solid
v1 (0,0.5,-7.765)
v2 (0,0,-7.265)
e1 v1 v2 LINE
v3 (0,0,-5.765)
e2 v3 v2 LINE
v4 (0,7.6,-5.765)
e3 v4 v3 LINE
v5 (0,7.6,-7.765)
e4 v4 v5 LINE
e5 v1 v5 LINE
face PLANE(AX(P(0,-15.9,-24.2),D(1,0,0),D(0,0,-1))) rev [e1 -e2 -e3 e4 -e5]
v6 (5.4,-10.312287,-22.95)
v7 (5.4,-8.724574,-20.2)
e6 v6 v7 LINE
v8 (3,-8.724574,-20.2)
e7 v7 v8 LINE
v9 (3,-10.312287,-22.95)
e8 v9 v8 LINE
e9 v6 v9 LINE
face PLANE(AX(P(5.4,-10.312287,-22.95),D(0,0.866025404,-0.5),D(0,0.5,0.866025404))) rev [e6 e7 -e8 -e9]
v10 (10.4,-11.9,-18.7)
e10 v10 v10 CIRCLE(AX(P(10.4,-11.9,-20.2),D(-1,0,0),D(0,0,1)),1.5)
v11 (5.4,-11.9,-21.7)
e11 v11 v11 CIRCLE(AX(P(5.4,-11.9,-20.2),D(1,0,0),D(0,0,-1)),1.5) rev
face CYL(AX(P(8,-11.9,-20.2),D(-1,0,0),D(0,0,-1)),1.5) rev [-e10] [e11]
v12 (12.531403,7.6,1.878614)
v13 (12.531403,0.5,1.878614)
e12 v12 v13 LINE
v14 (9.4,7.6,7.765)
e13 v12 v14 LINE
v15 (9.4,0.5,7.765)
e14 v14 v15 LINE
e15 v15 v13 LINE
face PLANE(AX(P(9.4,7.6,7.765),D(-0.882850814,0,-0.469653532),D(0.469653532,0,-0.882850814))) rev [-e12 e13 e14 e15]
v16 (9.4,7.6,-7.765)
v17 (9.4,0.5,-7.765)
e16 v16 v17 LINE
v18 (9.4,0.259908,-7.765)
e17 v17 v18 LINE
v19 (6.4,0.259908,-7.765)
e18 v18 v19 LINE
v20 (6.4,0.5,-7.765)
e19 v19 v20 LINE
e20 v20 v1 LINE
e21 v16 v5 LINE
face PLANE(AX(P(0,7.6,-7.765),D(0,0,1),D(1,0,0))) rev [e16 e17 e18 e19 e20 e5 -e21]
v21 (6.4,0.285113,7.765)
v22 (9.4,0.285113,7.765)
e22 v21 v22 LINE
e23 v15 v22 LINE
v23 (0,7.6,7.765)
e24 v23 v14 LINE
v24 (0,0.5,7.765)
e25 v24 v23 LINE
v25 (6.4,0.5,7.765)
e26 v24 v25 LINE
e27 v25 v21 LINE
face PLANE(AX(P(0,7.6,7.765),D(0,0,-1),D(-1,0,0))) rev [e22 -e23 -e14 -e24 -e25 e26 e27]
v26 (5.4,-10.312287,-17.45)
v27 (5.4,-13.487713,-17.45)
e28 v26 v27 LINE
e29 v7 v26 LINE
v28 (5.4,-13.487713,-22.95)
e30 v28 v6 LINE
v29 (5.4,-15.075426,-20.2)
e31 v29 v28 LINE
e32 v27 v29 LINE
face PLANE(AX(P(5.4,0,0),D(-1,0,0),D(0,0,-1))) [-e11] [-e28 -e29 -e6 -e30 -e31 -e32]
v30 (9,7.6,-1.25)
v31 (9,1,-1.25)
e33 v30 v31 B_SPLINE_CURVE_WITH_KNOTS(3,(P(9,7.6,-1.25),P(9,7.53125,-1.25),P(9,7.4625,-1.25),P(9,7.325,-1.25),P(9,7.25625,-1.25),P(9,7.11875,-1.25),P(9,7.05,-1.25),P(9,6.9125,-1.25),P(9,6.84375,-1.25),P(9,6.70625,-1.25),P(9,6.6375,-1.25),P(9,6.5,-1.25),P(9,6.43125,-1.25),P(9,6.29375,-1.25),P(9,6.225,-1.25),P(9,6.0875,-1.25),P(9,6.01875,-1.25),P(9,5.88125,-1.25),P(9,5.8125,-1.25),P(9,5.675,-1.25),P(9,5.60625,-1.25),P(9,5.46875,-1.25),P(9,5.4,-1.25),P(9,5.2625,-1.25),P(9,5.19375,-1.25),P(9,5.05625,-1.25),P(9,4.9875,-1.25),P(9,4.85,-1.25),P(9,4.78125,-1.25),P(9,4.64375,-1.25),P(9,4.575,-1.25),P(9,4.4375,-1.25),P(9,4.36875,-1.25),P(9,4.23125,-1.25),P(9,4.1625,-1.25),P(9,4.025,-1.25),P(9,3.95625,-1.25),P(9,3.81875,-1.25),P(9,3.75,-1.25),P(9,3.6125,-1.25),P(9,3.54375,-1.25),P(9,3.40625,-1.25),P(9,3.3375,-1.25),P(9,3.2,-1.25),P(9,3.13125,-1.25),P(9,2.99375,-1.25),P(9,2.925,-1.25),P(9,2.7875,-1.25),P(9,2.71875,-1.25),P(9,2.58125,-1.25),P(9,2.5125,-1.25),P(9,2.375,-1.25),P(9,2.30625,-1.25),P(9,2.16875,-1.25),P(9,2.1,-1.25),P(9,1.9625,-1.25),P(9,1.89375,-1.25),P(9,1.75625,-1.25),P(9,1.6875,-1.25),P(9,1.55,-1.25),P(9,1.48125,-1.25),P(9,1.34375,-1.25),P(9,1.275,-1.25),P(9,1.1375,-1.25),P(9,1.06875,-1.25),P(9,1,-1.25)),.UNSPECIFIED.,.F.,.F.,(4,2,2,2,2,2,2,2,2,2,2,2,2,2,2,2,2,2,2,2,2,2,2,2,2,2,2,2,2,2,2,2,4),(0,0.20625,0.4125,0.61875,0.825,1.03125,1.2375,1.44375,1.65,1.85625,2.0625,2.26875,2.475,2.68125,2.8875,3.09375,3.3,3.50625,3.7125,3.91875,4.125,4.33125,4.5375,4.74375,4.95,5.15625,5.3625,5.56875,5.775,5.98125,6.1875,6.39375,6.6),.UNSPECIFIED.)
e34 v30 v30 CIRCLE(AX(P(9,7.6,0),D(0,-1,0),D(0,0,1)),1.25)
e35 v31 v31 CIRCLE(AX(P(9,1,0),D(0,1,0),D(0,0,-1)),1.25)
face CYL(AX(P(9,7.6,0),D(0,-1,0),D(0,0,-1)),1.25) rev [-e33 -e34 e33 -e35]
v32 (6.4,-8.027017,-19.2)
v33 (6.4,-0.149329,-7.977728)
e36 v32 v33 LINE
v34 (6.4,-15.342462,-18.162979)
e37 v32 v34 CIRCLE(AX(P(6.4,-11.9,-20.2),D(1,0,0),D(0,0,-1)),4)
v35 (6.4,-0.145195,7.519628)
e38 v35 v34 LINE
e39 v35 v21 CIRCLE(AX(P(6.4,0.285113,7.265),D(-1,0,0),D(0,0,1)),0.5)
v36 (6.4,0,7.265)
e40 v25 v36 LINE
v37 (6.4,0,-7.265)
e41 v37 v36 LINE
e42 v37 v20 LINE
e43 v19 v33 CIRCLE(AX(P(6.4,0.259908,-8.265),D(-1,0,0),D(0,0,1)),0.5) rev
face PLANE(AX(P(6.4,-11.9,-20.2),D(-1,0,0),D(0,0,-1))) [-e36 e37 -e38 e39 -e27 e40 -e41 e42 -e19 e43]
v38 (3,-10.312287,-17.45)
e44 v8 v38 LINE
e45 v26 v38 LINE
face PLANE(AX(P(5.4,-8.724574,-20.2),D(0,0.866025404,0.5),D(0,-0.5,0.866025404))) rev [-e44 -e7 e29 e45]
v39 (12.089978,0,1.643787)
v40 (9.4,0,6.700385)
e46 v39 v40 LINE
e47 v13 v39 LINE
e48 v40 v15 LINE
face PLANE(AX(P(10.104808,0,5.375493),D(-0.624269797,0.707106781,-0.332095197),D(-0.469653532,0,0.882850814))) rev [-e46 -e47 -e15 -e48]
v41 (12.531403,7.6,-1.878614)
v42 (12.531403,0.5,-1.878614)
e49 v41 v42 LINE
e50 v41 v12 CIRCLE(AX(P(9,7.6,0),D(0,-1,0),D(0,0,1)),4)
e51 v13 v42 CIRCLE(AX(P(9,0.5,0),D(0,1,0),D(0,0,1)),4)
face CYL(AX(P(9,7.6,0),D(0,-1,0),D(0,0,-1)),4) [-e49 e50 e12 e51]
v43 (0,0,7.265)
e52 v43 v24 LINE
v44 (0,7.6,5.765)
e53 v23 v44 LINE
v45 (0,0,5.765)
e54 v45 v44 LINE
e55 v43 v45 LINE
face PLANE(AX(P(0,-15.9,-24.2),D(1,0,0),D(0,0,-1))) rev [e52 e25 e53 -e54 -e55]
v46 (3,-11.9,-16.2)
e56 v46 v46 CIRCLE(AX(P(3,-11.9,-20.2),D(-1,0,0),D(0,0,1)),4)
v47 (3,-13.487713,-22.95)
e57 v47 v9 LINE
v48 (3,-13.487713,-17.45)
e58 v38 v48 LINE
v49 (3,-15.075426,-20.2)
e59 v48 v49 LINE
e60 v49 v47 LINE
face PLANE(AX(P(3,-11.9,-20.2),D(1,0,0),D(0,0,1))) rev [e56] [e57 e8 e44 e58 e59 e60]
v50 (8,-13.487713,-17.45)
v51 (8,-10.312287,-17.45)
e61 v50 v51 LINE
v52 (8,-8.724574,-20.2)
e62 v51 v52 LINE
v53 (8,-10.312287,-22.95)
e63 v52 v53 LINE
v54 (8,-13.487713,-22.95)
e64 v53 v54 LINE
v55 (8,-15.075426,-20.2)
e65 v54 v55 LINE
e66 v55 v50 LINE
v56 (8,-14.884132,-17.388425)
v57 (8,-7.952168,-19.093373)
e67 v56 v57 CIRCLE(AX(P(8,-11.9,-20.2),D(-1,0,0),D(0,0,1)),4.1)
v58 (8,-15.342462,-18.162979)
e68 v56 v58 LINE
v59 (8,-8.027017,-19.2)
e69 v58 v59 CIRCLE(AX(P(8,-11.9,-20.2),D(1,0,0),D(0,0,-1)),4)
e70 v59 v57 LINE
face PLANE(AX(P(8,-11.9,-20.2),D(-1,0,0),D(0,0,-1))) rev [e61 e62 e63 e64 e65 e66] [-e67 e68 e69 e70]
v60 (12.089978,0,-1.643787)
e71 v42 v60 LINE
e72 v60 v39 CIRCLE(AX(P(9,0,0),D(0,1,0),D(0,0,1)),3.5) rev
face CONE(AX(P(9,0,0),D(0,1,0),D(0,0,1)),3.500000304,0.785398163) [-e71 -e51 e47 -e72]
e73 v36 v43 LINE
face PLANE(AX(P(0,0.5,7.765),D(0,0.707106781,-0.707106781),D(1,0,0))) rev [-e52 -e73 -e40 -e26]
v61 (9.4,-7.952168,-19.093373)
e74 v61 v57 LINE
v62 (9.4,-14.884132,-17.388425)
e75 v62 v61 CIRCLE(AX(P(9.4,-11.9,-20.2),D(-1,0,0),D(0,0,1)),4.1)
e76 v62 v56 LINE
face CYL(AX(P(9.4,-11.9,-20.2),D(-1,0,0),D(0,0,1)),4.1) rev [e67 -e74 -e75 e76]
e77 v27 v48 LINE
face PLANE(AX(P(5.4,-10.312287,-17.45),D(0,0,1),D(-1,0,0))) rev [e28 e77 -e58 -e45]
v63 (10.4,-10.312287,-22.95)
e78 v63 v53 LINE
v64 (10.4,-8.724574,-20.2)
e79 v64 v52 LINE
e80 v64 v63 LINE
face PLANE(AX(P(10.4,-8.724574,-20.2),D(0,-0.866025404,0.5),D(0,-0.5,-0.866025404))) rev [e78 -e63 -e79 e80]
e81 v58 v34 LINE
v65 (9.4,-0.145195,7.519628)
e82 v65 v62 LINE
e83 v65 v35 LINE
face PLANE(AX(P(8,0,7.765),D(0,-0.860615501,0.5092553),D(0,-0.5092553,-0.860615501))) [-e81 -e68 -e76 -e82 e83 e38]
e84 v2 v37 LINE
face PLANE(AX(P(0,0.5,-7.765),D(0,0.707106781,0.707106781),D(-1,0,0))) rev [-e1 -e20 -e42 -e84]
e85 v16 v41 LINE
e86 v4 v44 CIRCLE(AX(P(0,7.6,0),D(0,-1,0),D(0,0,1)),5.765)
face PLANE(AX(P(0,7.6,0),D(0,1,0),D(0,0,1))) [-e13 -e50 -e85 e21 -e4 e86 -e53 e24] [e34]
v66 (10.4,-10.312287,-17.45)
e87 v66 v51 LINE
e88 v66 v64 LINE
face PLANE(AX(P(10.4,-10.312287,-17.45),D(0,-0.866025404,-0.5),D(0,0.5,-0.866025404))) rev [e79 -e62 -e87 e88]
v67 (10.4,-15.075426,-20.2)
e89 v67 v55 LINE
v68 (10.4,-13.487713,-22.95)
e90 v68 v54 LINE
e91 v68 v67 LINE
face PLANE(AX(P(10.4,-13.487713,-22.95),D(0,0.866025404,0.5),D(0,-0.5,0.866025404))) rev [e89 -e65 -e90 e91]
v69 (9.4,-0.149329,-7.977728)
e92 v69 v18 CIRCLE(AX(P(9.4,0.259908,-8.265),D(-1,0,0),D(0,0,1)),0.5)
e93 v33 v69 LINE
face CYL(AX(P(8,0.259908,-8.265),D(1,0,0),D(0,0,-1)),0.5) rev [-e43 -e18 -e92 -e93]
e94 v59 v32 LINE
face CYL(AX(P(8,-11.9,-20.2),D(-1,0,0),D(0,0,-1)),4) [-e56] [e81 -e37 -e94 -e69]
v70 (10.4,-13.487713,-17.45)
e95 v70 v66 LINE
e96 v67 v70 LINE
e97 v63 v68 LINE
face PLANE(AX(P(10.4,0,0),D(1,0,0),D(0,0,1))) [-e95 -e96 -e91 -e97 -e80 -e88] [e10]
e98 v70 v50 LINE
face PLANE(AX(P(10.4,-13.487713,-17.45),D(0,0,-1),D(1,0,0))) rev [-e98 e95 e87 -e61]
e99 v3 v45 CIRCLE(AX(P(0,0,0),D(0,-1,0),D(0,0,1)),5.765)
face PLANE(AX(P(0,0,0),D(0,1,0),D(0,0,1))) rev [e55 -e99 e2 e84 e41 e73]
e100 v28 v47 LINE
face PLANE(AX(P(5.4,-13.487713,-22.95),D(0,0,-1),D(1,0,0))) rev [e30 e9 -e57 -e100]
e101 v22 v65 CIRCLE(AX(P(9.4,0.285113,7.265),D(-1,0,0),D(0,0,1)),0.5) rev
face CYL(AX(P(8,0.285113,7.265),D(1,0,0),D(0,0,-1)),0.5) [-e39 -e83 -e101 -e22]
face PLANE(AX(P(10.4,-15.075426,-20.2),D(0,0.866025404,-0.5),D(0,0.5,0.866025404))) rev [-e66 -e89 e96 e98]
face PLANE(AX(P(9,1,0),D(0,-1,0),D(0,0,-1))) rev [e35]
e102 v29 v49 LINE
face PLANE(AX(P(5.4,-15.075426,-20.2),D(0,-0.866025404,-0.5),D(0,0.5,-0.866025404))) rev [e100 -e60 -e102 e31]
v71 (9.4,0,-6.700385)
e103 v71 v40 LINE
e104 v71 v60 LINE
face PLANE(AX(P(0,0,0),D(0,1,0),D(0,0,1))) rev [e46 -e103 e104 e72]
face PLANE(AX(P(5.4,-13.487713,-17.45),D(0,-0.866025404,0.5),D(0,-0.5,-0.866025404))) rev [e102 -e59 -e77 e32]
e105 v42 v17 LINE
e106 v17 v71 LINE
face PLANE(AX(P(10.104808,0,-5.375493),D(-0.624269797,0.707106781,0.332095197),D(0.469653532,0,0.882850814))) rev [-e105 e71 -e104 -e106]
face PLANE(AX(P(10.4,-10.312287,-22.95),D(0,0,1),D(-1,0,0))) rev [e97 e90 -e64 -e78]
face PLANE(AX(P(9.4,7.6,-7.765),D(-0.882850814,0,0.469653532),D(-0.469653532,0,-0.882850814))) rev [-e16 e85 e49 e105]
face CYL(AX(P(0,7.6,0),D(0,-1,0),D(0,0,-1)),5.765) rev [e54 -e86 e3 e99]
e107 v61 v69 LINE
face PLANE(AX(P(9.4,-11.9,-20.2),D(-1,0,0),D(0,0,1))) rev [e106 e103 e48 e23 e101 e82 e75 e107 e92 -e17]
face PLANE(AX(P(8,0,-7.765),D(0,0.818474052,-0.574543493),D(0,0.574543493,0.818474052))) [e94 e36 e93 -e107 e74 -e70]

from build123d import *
from build123d.topology import SkipClean

# Parameters (mm, degrees)
SKETCH1_R            = 1.25
BRACKET_DEPTH        = 7.6
SKETCH2_R            = 1.5
ARM_DEPTH            = 1.6
SKETCH3_R            = 1.25
MOUNT_BLIND_DEPTH    = 1
EFFECTOR_START       = -5
SKETCH4_R            = 4
SKETCH4_R_2          = 1.5
EFFECTOR_MOUNT_DEPTH = 5
MOUNT_TRAP_DEPTH     = 2.4
SKETCH6_R            = 1.5
MOUNT_ADAPTOR_DEPTH  = 2.4
SKETCH7_W            = 12.99999996
SKETCH7_H            = 31.965
MIRROR_DELETE_DEPTH  = 37.150933583
ARM_SUPPORT_DEPTH    = 1.4
BODY_CHAMFER_SIZE    = 0.5
ARM_FILLET_R         = 0.5


with BuildPart() as part:
    # Sketch1 → Bracket (new body)
    with BuildSketch(Plane(origin=(0, 0, 0), x_dir=(1, 0, 0), z_dir=(0, 1, 0))):
        with BuildLine():
            Line((0, 7.765), (-9.4, 7.765))
            Line((-9.4, 7.765), (-12.531403257, 1.878614127))
            ThreePointArc((-12.531403257, 1.878614127), (-12.99999996, 0), (-12.531403257, -1.878614127))
            Line((-12.531403257, -1.878614127), (-9.4, -7.765))
            Line((-9.4, -7.765), (0, -7.765))
            Line((0, -7.765), (0, -5.765))
            ThreePointArc((0, -5.765), (-5.765, 0), (0, 5.765))
            Line((0, 5.765), (0, 7.765))
        make_face()
        with Locations(Location((-9, 0, 0), (0, 0, 90))):
            Circle(SKETCH1_R, mode=Mode.SUBTRACT)
    bracket = extrude(amount=BRACKET_DEPTH)

    # Sketch2 → Arm (add)
    with BuildSketch(Plane(origin=(-6.4, 0, 0), x_dir=(0, 0, -1), z_dir=(1, 0, 0))):
        with BuildLine():
            Line((-7.765, 0), (18.162978801, -15.342462002))
            ThreePointArc((18.162978801, -15.342462002), (24.160405232, -12.461418203), (19.2, -8.027016654))
            Line((19.2, -8.027016654), (7.765, 0))
            Line((7.765, 0), (-7.765, 0))
        make_face()
        with Locations((20.2, -11.9)):
            Circle(SKETCH2_R, mode=Mode.SUBTRACT)
    arm = extrude(amount=-ARM_DEPTH)

    # Sketch3 → Mount Blind (add)
    with BuildSketch(Plane.XZ):
        with Locations(Location((-9, 0, 0), (0, 0, 270))):
            Circle(SKETCH3_R)
    mount_blind = extrude(amount=-MOUNT_BLIND_DEPTH)

    # Sketch4 → Effector Mount (add)
    with SkipClean():  # the faces are left unmerged after this step: merging them gives an invalid solid
        with BuildSketch(Plane.ZY.offset(8).offset(EFFECTOR_START)):
            with Locations(Location((-20.2, -11.9, 0), (0, 0, 75.522487814))):
                Circle(SKETCH4_R)
            with Locations(Location((-20.2, -11.9, 0), (0, 0, 180))):
                Circle(SKETCH4_R_2, mode=Mode.SUBTRACT)
        effector_mount = extrude(amount=EFFECTOR_MOUNT_DEPTH)

    # Sketch5 → Mount Trap (cut)
    with SkipClean():  # the faces are left unmerged after this step: merging them gives an invalid solid
        with BuildSketch(Plane(origin=(-3, 0, 0), x_dir=(0, 0, -1), z_dir=(1, 0, 0))):
            Polygon((20.2, -8.724573519), (17.45, -10.31228676), (17.45, -13.48771324), (20.2, -15.075426481), (22.95, -13.48771324), (22.95, -10.31228676), align=None)
        mount_trap = extrude(amount=-MOUNT_TRAP_DEPTH, mode=Mode.SUBTRACT)

    # Sketch6 → Mount Adaptor (add)
    with SkipClean():  # the faces are left unmerged after this step: merging them gives an invalid solid
        with BuildSketch(Plane.ZY.offset(8)):
            Polygon((-17.45, -10.31228676), (-20.2, -8.724573519), (-22.95, -10.31228676), (-22.95, -13.48771324), (-20.2, -15.075426481), (-17.45, -13.48771324), align=None)
            with Locations(Location((-20.2, -11.9, 0), (0, 0, 180))):
                Circle(SKETCH6_R, mode=Mode.SUBTRACT)
        mount_adaptor = extrude(amount=MOUNT_ADAPTOR_DEPTH)

    # Mirror 2: Bracket, Arm, Mount Blind, Effector Mount, Mount Trap, Mount Adaptor across plane
    with SkipClean():  # the faces are left unmerged after this step: merging them gives an invalid solid
        add(bracket.mirror(Plane(origin=(0, 0, 0), x_dir=(0, 0, 1), z_dir=(1, 0, 0))))
        add(arm.mirror(Plane(origin=(0, 0, 0), x_dir=(0, 0, 1), z_dir=(1, 0, 0))))
        add(mount_blind.mirror(Plane(origin=(0, 0, 0), x_dir=(0, 0, 1), z_dir=(1, 0, 0))))
        add(effector_mount.mirror(Plane(origin=(0, 0, 0), x_dir=(0, 0, 1), z_dir=(1, 0, 0))))
        add(mount_trap.mirror(Plane(origin=(0, 0, 0), x_dir=(0, 0, 1), z_dir=(1, 0, 0))), mode=Mode.SUBTRACT)
        add(mount_adaptor.mirror(Plane(origin=(0, 0, 0), x_dir=(0, 0, 1), z_dir=(1, 0, 0))))

    # Sketch7 → Mirror Delete (cut, through all)
    with SkipClean():  # the faces are left unmerged after this step: merging them gives an invalid solid
        with BuildSketch(Plane(origin=(0, 7.6, 0), x_dir=(1, 0, 0), z_dir=(0, 1, 0))):
            with Locations((-6.49999998, 8.2175)):
                Rectangle(SKETCH7_W, SKETCH7_H)
        extrude(amount=-MIRROR_DELETE_DEPTH, mode=Mode.SUBTRACT)

    # Sketch8 → Arm Support (add)
    with SkipClean():  # the faces are left unmerged after this step: merging them gives an invalid solid
        with BuildSketch(Plane(origin=(8, 0, 0), x_dir=(0, 0, -1), z_dir=(1, 0, 0))):
            with BuildLine():
                Line((7.765, 0), (19.093373314, -7.952168015))
                ThreePointArc((19.093373314, -7.952168015), (16.218654953, -10.920769884), (17.388424851, -14.884132232))
                Line((17.388424851, -14.884132232), (-7.765, 0))
                Line((-7.765, 0), (7.765, 0))
            make_face()
        extrude(amount=ARM_SUPPORT_DEPTH)

    # Body Chamfer
    # the kernel refuses this chamfer: 0.5 mm, written as the material it takes off along each edge
    with BuildSketch(Plane(origin=(8.796100001, 0, -8.90020621), x_dir=(0.024274757051952575, 0.9996219169112968, -0.012913535559763734), z_dir=(0.4696535317878062, 0, 0.8828508141692119))) as body_chamfer_piece_1_section:
        Polygon((BODY_CHAMFER_SIZE * 0.999621916911, BODY_CHAMFER_SIZE * 0.0274958766106), (-BODY_CHAMFER_SIZE * 0.0274958766106, BODY_CHAMFER_SIZE * 0.999621916911), (0, 0), align=None)
    body_chamfer_piece_1 = extrude(amount=7.953316653, mode=Mode.PRIVATE)
    body_chamfer_piece_1 = split(body_chamfer_piece_1, bisect_by=Plane(origin=(9.4, 0.324892832, -7.480239841), z_dir=(1, 0, 0)), keep=Keep.TOP, mode=Mode.PRIVATE)
    add(body_chamfer_piece_1, mode=Mode.SUBTRACT)
    with BuildSketch(Plane(origin=(8.999999655, 0, 0), x_dir=(0.8828508331840651, 0, -0.4696534960438411), z_dir=(-0.4696534960438411, 0, -0.8828508331840651))) as body_chamfer_piece_2:
        Polygon((4.000000304, -BODY_CHAMFER_SIZE), (4.000000304 - BODY_CHAMFER_SIZE, 0), (4.000000304, 0), align=None)
    revolve(axis=Axis((8.999999655, 0, 0), (0, -1, 0)), revolution_arc=56.023613132, mode=Mode.SUBTRACT)
    with BuildSketch(Plane(origin=(12.531403257, 0, 1.878614127), x_dir=(0.02427475705195258, 0.9996219169112968, 0.012913535559763729), z_dir=(-0.46965353178780606, 0, 0.8828508141692119))) as body_chamfer_piece_3_section:
        Polygon((BODY_CHAMFER_SIZE * 0.999621916911, BODY_CHAMFER_SIZE * 0.0274958766106), (-BODY_CHAMFER_SIZE * 0.0274958766106, BODY_CHAMFER_SIZE * 0.999621916911), (0, 0), align=None)
    body_chamfer_piece_3 = extrude(amount=7.953316653, mode=Mode.PRIVATE)
    body_chamfer_piece_3 = split(body_chamfer_piece_3, bisect_by=Plane(origin=(9.4, 0.173767424, 5.065126353), z_dir=(1, 0, 0)), keep=Keep.TOP, mode=Mode.PRIVATE)
    add(body_chamfer_piece_3, mode=Mode.SUBTRACT)
    with BuildSketch(Plane(origin=(6.4, 0, 7.765), x_dir=(0, -0.02749587661058639, -0.9996219169112968), z_dir=(-1, 0, 0)), Plane(origin=(-1.285841494, 0, -7.765), x_dir=(0, -0.02749587661058639, 0.9996219169112968), z_dir=(1, 0, 0))) as body_chamfer_piece_4:
        Polygon((BODY_CHAMFER_SIZE * 0.999621916911, -BODY_CHAMFER_SIZE * 0.0274958766106), (-BODY_CHAMFER_SIZE * 0.0274958766106, -BODY_CHAMFER_SIZE * 0.999621916911), (0, 0), align=None)
    extrude(amount=7.685841494, mode=Mode.SUBTRACT)
    with BuildSketch(Plane(origin=(10.693671764, 0, 7.765), x_dir=(0, 0.9998167148671796, 0.019145147484436967), z_dir=(-1, 0, 0))) as body_chamfer_piece_5_section:
        Polygon((BODY_CHAMFER_SIZE * 0.999816714867, BODY_CHAMFER_SIZE * 0.0191451474844), (-BODY_CHAMFER_SIZE * 0.52563857146, BODY_CHAMFER_SIZE * 0.850707994669), (0, 0), align=None)
    body_chamfer_piece_5 = extrude(amount=2.693671764, mode=Mode.PRIVATE)
    body_chamfer_piece_5 = split(body_chamfer_piece_5, bisect_by=Plane(origin=(9.4, 0.125, 7.622443684), z_dir=(1, 0, 0)), keep=Keep.TOP, mode=Mode.PRIVATE)
    add(body_chamfer_piece_5, mode=Mode.SUBTRACT)

    # Arm Fillet
    arm_fillet_edges = [part.edges().sort_by_distance(p)[0] for p in [
        (7.2, 0, -7.765),
        (7.2, 0, 7.765),
    ]]
    fillet(arm_fillet_edges, radius=ARM_FILLET_R)


solid = part.part
